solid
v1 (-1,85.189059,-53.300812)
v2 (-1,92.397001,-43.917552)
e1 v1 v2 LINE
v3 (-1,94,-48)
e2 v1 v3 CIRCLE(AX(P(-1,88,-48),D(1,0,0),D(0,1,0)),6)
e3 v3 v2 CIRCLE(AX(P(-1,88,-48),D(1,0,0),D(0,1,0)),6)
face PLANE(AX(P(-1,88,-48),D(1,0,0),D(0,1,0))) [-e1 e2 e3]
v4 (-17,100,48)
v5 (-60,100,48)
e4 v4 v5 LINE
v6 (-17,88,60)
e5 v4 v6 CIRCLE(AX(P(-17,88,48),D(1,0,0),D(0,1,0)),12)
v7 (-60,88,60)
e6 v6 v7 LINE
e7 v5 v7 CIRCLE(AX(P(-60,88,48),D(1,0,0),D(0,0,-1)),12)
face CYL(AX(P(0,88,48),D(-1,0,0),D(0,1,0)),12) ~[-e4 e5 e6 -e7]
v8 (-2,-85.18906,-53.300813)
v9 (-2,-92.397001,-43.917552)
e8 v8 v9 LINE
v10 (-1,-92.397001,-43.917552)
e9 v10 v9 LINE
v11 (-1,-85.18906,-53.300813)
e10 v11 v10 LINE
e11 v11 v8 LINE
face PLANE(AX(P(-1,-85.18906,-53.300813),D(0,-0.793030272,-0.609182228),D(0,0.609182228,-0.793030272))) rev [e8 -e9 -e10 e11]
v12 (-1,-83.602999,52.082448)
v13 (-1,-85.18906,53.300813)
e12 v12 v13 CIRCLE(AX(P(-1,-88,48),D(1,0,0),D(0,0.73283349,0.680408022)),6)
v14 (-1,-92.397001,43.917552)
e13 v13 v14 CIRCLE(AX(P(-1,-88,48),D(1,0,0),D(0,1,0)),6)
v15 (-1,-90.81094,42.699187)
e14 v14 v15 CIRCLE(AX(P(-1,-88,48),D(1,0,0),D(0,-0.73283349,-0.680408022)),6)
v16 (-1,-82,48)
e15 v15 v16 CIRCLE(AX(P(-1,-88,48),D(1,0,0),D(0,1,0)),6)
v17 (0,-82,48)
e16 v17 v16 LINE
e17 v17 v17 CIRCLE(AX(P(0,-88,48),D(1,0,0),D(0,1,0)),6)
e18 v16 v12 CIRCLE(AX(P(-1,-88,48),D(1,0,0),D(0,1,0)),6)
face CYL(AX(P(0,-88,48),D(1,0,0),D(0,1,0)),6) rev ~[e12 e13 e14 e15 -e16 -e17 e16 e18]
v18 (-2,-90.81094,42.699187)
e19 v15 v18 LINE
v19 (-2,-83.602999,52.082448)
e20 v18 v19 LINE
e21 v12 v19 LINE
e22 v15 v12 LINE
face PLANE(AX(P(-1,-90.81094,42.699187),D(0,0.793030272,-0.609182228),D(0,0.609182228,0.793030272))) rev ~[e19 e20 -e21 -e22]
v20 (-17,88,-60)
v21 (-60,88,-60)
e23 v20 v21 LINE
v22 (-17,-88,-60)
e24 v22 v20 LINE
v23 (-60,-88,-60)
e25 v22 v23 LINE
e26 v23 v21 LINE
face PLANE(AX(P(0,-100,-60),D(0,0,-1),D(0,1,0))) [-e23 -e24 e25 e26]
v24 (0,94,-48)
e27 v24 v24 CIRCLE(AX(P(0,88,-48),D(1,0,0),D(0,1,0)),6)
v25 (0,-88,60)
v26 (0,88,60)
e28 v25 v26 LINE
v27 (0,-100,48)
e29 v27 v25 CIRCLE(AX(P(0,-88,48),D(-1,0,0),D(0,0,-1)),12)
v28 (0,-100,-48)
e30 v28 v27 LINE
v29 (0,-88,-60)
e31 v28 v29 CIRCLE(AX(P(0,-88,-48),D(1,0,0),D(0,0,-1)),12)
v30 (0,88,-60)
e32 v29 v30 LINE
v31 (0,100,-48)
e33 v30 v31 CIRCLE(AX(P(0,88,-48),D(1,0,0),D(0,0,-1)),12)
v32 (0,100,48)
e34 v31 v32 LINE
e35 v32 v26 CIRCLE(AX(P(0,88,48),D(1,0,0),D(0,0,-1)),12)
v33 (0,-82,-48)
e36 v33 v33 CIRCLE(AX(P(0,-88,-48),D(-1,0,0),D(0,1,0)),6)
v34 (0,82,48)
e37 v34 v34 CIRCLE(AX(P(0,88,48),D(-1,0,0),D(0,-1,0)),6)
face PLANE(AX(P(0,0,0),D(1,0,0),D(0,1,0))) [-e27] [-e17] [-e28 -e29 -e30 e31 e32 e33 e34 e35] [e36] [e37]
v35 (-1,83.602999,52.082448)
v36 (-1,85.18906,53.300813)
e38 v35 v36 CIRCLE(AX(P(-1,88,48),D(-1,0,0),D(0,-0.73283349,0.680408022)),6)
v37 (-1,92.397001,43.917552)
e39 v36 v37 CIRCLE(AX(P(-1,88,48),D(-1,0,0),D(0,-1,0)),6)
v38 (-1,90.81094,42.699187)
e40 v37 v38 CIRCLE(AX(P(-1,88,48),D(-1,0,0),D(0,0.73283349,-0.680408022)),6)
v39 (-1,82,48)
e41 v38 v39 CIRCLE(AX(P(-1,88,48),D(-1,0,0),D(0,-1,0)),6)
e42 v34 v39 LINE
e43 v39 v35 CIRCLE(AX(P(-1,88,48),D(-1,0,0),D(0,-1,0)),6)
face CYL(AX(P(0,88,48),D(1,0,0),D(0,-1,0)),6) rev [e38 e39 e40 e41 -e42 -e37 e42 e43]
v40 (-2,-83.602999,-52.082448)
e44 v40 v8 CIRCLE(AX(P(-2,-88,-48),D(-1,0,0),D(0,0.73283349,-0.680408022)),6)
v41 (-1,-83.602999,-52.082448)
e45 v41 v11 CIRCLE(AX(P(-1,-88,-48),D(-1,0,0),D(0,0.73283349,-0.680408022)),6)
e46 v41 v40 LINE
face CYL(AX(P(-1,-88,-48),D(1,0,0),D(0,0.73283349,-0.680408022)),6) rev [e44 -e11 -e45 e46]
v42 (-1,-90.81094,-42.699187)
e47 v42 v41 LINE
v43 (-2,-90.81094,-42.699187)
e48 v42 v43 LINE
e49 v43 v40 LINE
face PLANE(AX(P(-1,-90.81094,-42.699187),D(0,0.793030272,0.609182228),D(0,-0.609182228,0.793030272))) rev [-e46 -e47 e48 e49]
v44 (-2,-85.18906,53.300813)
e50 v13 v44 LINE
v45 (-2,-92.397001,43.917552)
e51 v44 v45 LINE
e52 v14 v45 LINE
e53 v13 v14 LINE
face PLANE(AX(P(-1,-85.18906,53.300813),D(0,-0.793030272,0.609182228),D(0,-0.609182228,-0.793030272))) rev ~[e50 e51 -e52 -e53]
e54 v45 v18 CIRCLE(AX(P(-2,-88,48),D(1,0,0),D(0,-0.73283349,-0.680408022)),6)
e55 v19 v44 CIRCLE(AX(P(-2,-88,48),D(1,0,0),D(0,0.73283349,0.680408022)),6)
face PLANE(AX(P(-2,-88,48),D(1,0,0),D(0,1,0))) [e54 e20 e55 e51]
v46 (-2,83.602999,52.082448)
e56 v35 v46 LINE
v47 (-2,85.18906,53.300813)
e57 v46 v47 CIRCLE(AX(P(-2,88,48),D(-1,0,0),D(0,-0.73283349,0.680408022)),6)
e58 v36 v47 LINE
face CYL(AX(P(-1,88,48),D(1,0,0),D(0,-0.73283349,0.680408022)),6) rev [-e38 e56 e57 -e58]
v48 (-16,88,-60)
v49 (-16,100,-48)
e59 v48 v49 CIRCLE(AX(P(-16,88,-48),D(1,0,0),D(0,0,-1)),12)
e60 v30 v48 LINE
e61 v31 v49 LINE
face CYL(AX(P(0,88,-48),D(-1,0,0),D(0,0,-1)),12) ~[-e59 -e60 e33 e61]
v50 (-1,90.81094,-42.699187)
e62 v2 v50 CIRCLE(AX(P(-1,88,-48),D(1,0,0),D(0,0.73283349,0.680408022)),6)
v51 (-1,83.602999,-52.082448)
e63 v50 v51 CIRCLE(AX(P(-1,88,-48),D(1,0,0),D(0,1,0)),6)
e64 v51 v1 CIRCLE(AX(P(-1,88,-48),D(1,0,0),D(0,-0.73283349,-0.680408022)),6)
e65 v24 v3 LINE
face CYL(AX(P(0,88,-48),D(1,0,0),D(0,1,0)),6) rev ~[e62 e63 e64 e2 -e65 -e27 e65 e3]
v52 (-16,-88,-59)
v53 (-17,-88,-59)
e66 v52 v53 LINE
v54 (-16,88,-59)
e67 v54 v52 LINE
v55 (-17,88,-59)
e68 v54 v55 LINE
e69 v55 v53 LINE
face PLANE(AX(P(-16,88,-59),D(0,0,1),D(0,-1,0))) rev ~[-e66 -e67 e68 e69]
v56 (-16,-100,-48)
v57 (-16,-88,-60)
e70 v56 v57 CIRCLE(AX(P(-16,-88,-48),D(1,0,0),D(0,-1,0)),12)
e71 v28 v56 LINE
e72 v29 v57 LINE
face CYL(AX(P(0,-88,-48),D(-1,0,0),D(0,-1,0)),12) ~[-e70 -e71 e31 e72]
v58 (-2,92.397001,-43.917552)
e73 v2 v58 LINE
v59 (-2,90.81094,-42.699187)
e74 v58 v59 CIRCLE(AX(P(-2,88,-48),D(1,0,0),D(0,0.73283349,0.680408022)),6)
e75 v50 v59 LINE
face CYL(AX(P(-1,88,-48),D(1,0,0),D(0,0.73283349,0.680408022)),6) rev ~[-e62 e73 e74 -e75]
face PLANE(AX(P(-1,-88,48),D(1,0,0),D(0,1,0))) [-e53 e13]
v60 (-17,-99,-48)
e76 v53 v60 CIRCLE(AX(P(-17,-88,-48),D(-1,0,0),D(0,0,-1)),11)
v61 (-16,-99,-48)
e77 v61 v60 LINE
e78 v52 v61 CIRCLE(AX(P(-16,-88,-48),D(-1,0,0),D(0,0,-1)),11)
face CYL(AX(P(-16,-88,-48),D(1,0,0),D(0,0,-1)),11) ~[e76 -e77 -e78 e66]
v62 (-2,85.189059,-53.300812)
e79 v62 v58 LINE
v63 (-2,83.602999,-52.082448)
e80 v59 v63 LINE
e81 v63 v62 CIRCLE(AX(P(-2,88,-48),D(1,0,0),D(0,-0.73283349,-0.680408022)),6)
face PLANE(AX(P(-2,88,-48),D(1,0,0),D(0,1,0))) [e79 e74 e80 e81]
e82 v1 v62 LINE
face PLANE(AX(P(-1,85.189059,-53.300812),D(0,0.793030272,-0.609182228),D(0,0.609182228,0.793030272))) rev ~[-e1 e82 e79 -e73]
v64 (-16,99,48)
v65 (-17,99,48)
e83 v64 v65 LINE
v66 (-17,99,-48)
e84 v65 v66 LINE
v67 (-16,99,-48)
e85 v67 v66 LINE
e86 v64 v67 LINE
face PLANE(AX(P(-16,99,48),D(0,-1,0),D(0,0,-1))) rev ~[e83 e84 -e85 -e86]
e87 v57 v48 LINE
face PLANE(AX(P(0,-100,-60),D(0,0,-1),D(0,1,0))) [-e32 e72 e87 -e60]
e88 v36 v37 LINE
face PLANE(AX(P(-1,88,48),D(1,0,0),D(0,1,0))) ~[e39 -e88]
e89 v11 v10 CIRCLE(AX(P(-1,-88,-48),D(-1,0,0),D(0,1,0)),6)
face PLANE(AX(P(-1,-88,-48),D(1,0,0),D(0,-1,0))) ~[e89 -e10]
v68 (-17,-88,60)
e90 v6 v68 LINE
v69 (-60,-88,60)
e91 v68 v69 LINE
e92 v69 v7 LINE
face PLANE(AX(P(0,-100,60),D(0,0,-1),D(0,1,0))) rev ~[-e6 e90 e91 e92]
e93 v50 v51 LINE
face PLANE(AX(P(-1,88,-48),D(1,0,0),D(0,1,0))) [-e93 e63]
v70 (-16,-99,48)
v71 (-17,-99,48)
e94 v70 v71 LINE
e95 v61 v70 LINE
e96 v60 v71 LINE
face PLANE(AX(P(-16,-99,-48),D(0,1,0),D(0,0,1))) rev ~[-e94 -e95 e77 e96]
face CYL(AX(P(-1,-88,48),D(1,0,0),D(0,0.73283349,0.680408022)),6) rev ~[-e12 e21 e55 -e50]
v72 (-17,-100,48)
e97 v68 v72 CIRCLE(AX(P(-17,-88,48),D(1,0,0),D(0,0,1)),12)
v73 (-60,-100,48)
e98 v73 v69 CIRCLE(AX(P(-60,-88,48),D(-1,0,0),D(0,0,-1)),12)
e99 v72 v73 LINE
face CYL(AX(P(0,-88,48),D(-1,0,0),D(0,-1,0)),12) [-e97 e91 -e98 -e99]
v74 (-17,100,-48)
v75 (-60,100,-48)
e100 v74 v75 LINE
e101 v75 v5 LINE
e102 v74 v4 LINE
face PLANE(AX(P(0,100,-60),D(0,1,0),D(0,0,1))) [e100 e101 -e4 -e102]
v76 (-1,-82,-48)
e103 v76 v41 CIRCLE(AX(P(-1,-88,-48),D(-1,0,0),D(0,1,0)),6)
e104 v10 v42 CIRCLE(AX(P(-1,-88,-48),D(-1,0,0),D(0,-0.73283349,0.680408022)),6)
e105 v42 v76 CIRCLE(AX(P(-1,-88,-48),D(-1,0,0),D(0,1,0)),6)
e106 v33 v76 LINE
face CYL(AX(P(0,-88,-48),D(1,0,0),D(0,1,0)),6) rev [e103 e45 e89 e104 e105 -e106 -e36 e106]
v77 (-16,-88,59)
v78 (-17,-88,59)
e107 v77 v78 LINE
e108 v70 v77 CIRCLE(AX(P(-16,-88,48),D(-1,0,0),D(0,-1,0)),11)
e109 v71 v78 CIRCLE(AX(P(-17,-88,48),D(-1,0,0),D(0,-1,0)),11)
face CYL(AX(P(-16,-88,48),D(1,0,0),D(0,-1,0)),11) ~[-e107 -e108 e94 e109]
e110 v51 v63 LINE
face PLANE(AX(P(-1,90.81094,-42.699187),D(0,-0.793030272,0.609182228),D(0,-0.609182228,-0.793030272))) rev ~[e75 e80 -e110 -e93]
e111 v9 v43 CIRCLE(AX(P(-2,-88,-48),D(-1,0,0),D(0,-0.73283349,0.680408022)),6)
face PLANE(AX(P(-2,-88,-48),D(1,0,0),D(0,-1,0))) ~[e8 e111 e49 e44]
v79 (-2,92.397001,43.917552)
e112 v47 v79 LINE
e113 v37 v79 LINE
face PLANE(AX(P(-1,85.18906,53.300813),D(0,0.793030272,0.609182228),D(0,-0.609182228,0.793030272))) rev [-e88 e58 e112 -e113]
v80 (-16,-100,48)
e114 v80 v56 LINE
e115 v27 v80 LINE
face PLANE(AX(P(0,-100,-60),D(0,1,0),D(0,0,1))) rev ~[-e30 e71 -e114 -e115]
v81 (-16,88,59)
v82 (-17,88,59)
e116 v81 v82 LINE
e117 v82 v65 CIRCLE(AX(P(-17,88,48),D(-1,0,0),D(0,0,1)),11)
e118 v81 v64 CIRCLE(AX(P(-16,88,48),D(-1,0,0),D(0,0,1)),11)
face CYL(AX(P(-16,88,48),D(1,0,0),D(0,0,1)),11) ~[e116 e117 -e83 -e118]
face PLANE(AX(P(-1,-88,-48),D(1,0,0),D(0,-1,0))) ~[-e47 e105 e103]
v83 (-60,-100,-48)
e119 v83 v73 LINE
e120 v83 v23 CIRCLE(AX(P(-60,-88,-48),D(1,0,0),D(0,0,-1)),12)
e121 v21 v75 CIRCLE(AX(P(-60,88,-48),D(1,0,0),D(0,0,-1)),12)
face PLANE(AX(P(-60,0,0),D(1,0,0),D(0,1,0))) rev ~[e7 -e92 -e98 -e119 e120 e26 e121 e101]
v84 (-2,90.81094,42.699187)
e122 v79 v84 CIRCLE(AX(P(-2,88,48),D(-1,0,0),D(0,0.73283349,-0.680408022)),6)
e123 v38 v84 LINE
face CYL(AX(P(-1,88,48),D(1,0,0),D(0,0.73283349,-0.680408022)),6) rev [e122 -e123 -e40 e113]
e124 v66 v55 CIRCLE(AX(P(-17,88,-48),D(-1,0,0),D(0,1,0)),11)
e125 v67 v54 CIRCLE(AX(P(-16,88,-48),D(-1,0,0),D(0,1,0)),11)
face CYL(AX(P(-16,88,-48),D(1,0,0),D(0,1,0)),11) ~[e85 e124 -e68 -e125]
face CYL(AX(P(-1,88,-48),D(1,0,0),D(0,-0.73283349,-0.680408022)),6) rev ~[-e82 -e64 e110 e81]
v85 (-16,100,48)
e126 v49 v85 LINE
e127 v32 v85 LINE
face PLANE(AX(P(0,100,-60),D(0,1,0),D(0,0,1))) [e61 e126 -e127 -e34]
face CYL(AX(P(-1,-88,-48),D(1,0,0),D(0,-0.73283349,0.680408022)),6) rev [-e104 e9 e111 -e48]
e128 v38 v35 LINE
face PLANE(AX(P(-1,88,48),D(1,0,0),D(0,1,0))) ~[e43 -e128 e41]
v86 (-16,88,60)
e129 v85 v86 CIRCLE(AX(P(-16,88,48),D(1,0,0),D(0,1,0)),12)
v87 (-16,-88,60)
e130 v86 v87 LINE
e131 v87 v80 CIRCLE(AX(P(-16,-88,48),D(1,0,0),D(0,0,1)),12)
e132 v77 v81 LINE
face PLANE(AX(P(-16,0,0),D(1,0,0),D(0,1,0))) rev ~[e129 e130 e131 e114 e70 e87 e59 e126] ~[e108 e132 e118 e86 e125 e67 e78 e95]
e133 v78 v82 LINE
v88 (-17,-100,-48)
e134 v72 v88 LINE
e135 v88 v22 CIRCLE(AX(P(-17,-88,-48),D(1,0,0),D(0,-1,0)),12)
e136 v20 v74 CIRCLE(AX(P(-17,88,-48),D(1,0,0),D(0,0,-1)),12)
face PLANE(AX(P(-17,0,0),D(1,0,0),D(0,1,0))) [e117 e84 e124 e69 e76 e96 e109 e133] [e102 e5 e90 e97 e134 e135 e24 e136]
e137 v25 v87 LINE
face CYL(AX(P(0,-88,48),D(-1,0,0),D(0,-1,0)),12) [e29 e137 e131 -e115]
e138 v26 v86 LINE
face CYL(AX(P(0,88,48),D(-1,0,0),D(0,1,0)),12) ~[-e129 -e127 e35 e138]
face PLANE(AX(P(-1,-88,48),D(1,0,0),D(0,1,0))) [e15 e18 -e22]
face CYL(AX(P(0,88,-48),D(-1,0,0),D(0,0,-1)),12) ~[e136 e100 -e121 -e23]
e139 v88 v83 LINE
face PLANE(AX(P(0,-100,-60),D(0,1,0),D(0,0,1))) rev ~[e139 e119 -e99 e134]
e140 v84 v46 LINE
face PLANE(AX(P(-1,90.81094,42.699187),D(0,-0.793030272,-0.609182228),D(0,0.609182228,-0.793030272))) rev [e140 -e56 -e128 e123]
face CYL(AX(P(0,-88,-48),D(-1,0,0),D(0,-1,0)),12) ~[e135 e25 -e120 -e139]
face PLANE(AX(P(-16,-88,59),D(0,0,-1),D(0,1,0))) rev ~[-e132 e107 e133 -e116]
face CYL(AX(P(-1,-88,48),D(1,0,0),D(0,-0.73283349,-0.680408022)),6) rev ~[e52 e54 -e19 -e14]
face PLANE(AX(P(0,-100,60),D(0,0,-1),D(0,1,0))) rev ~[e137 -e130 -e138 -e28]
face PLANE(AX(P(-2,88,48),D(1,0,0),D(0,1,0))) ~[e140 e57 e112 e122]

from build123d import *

# Parameters (mm, degrees)
F0_W             = 200
F0_H             = 120
F1_DEPTH         = 60
F2_R             = 12
F5_DEPTH         = 1
F6_R             = 6
F7_DEPTH         = 1
F7_COPIES2_COUNT = 2
F7_COPIES2_PITCH = 200.479425
F9_DEPTH         = 1
F9_COPIES2_COUNT = 2
F9_COPIES2_PITCH = 200.479425


# Not quite as in the source:
# - a pattern or mirror of a feature is missing from the dataset's text; its kind, count and spacing are read off the source's solid


with BuildPart() as f1:
    # F0 (on Right) → F1 (new body)
    with BuildSketch(Plane.YZ):
        Rectangle(F0_W, F0_H)
    extrude(amount=-F1_DEPTH)

    # F2
    f2_edges = [f1.edges().sort_by_distance(p)[0] for p in [
        (-30, -100, 60),
        (-30, -100, -60),
        (-30, 100, -60),
        (-30, 100, 60),
    ]]
    fillet(f2_edges, radius=F2_R)

    # F4 (on offset) → F5 (cut)
    with BuildSketch(Plane.YZ.offset(-16)):
        with BuildLine():
            ThreePointArc((-88, 60), (-96.4852813742, 56.4852813742), (-100, 48))
            Line((-100, 48), (-100, -48))
            ThreePointArc((-100, -48), (-96.4852813742, -56.4852813742), (-88, -60))
            Line((-88, -60), (88, -60))
            ThreePointArc((88, -60), (96.4852813742, -56.4852813742), (100, -48))
            Line((100, -48), (100, 48))
            ThreePointArc((100, 48), (96.4852813742, 56.4852813742), (88, 60))
            Line((88, 60), (-88, 60))
        make_face()
        with BuildLine():
            ThreePointArc((-99, 48), (-95.7781745931, 55.7781745931), (-88, 59))
            Line((-88, 59), (88, 59))
            ThreePointArc((88, 59), (95.7781745931, 55.7781745931), (99, 48))
            Line((99, 48), (99, -48))
            ThreePointArc((99, -48), (95.7781745931, -55.7781745931), (88, -59))
            Line((88, -59), (-88, -59))
            ThreePointArc((-88, -59), (-95.7781745931, -55.7781745931), (-99, -48))
            Line((-99, -48), (-99, 48))
        make_face(mode=Mode.SUBTRACT)
    extrude(amount=-F5_DEPTH, mode=Mode.SUBTRACT)

    # F6 (on face) → F7 (cut)
    with BuildSketch(Plane.YZ):
        with Locations((-88, 48)):
            Circle(F6_R)
    f7 = extrude(amount=-F7_DEPTH, mode=Mode.SUBTRACT)

    # F7_copies: F7 across plane
    add(f7.mirror(Plane.ZX), mode=Mode.SUBTRACT)

    # F7_copies1: F7 across plane
    add(f7.mirror(Plane(origin=(0, 0, 0), x_dir=(-1, 0, 0), z_dir=(0, 0, -1))), mode=Mode.SUBTRACT)

    # F7_copies2: F7 ×2
    with Locations(*[Vector(0, 0.8778955729, -0.4788521307) * (i * F7_COPIES2_PITCH) for i in range(1, F7_COPIES2_COUNT)]):
        add(f7, mode=Mode.SUBTRACT)

    # F8 (on face) → F9 (cut)
    with BuildSketch(Plane.YZ.offset(-1)):
        with BuildLine():
            Line((-90.8109403928, 42.6991874106), (-83.6029990627, 52.0824481328))
            ThreePointArc((-83.6029990627, 52.0824481328), (-84.3449066302, 52.7581816336), (-85.1890596072, 53.3008125894))
            Line((-85.1890596072, 53.3008125894), (-92.3970009373, 43.9175518672))
            ThreePointArc((-92.3970009373, 43.9175518672), (-91.6550933698, 43.2418183664), (-90.8109403928, 42.6991874106))
        make_face()
    f9 = extrude(amount=-F9_DEPTH, mode=Mode.SUBTRACT)

    # F9_copies: F9 across plane
    add(f9.mirror(Plane.ZX), mode=Mode.SUBTRACT)

    # F9_copies1: F9 across plane
    add(f9.mirror(Plane(origin=(0, 0, 0), x_dir=(-1, 0, 0), z_dir=(0, 0, -1))), mode=Mode.SUBTRACT)

    # F9_copies2: F9 ×2
    with Locations(*[Vector(0, 0.8778955729, -0.4788521307) * (i * F9_COPIES2_PITCH) for i in range(1, F9_COPIES2_COUNT)]):
        add(f9, mode=Mode.SUBTRACT)


solid = f1.part
